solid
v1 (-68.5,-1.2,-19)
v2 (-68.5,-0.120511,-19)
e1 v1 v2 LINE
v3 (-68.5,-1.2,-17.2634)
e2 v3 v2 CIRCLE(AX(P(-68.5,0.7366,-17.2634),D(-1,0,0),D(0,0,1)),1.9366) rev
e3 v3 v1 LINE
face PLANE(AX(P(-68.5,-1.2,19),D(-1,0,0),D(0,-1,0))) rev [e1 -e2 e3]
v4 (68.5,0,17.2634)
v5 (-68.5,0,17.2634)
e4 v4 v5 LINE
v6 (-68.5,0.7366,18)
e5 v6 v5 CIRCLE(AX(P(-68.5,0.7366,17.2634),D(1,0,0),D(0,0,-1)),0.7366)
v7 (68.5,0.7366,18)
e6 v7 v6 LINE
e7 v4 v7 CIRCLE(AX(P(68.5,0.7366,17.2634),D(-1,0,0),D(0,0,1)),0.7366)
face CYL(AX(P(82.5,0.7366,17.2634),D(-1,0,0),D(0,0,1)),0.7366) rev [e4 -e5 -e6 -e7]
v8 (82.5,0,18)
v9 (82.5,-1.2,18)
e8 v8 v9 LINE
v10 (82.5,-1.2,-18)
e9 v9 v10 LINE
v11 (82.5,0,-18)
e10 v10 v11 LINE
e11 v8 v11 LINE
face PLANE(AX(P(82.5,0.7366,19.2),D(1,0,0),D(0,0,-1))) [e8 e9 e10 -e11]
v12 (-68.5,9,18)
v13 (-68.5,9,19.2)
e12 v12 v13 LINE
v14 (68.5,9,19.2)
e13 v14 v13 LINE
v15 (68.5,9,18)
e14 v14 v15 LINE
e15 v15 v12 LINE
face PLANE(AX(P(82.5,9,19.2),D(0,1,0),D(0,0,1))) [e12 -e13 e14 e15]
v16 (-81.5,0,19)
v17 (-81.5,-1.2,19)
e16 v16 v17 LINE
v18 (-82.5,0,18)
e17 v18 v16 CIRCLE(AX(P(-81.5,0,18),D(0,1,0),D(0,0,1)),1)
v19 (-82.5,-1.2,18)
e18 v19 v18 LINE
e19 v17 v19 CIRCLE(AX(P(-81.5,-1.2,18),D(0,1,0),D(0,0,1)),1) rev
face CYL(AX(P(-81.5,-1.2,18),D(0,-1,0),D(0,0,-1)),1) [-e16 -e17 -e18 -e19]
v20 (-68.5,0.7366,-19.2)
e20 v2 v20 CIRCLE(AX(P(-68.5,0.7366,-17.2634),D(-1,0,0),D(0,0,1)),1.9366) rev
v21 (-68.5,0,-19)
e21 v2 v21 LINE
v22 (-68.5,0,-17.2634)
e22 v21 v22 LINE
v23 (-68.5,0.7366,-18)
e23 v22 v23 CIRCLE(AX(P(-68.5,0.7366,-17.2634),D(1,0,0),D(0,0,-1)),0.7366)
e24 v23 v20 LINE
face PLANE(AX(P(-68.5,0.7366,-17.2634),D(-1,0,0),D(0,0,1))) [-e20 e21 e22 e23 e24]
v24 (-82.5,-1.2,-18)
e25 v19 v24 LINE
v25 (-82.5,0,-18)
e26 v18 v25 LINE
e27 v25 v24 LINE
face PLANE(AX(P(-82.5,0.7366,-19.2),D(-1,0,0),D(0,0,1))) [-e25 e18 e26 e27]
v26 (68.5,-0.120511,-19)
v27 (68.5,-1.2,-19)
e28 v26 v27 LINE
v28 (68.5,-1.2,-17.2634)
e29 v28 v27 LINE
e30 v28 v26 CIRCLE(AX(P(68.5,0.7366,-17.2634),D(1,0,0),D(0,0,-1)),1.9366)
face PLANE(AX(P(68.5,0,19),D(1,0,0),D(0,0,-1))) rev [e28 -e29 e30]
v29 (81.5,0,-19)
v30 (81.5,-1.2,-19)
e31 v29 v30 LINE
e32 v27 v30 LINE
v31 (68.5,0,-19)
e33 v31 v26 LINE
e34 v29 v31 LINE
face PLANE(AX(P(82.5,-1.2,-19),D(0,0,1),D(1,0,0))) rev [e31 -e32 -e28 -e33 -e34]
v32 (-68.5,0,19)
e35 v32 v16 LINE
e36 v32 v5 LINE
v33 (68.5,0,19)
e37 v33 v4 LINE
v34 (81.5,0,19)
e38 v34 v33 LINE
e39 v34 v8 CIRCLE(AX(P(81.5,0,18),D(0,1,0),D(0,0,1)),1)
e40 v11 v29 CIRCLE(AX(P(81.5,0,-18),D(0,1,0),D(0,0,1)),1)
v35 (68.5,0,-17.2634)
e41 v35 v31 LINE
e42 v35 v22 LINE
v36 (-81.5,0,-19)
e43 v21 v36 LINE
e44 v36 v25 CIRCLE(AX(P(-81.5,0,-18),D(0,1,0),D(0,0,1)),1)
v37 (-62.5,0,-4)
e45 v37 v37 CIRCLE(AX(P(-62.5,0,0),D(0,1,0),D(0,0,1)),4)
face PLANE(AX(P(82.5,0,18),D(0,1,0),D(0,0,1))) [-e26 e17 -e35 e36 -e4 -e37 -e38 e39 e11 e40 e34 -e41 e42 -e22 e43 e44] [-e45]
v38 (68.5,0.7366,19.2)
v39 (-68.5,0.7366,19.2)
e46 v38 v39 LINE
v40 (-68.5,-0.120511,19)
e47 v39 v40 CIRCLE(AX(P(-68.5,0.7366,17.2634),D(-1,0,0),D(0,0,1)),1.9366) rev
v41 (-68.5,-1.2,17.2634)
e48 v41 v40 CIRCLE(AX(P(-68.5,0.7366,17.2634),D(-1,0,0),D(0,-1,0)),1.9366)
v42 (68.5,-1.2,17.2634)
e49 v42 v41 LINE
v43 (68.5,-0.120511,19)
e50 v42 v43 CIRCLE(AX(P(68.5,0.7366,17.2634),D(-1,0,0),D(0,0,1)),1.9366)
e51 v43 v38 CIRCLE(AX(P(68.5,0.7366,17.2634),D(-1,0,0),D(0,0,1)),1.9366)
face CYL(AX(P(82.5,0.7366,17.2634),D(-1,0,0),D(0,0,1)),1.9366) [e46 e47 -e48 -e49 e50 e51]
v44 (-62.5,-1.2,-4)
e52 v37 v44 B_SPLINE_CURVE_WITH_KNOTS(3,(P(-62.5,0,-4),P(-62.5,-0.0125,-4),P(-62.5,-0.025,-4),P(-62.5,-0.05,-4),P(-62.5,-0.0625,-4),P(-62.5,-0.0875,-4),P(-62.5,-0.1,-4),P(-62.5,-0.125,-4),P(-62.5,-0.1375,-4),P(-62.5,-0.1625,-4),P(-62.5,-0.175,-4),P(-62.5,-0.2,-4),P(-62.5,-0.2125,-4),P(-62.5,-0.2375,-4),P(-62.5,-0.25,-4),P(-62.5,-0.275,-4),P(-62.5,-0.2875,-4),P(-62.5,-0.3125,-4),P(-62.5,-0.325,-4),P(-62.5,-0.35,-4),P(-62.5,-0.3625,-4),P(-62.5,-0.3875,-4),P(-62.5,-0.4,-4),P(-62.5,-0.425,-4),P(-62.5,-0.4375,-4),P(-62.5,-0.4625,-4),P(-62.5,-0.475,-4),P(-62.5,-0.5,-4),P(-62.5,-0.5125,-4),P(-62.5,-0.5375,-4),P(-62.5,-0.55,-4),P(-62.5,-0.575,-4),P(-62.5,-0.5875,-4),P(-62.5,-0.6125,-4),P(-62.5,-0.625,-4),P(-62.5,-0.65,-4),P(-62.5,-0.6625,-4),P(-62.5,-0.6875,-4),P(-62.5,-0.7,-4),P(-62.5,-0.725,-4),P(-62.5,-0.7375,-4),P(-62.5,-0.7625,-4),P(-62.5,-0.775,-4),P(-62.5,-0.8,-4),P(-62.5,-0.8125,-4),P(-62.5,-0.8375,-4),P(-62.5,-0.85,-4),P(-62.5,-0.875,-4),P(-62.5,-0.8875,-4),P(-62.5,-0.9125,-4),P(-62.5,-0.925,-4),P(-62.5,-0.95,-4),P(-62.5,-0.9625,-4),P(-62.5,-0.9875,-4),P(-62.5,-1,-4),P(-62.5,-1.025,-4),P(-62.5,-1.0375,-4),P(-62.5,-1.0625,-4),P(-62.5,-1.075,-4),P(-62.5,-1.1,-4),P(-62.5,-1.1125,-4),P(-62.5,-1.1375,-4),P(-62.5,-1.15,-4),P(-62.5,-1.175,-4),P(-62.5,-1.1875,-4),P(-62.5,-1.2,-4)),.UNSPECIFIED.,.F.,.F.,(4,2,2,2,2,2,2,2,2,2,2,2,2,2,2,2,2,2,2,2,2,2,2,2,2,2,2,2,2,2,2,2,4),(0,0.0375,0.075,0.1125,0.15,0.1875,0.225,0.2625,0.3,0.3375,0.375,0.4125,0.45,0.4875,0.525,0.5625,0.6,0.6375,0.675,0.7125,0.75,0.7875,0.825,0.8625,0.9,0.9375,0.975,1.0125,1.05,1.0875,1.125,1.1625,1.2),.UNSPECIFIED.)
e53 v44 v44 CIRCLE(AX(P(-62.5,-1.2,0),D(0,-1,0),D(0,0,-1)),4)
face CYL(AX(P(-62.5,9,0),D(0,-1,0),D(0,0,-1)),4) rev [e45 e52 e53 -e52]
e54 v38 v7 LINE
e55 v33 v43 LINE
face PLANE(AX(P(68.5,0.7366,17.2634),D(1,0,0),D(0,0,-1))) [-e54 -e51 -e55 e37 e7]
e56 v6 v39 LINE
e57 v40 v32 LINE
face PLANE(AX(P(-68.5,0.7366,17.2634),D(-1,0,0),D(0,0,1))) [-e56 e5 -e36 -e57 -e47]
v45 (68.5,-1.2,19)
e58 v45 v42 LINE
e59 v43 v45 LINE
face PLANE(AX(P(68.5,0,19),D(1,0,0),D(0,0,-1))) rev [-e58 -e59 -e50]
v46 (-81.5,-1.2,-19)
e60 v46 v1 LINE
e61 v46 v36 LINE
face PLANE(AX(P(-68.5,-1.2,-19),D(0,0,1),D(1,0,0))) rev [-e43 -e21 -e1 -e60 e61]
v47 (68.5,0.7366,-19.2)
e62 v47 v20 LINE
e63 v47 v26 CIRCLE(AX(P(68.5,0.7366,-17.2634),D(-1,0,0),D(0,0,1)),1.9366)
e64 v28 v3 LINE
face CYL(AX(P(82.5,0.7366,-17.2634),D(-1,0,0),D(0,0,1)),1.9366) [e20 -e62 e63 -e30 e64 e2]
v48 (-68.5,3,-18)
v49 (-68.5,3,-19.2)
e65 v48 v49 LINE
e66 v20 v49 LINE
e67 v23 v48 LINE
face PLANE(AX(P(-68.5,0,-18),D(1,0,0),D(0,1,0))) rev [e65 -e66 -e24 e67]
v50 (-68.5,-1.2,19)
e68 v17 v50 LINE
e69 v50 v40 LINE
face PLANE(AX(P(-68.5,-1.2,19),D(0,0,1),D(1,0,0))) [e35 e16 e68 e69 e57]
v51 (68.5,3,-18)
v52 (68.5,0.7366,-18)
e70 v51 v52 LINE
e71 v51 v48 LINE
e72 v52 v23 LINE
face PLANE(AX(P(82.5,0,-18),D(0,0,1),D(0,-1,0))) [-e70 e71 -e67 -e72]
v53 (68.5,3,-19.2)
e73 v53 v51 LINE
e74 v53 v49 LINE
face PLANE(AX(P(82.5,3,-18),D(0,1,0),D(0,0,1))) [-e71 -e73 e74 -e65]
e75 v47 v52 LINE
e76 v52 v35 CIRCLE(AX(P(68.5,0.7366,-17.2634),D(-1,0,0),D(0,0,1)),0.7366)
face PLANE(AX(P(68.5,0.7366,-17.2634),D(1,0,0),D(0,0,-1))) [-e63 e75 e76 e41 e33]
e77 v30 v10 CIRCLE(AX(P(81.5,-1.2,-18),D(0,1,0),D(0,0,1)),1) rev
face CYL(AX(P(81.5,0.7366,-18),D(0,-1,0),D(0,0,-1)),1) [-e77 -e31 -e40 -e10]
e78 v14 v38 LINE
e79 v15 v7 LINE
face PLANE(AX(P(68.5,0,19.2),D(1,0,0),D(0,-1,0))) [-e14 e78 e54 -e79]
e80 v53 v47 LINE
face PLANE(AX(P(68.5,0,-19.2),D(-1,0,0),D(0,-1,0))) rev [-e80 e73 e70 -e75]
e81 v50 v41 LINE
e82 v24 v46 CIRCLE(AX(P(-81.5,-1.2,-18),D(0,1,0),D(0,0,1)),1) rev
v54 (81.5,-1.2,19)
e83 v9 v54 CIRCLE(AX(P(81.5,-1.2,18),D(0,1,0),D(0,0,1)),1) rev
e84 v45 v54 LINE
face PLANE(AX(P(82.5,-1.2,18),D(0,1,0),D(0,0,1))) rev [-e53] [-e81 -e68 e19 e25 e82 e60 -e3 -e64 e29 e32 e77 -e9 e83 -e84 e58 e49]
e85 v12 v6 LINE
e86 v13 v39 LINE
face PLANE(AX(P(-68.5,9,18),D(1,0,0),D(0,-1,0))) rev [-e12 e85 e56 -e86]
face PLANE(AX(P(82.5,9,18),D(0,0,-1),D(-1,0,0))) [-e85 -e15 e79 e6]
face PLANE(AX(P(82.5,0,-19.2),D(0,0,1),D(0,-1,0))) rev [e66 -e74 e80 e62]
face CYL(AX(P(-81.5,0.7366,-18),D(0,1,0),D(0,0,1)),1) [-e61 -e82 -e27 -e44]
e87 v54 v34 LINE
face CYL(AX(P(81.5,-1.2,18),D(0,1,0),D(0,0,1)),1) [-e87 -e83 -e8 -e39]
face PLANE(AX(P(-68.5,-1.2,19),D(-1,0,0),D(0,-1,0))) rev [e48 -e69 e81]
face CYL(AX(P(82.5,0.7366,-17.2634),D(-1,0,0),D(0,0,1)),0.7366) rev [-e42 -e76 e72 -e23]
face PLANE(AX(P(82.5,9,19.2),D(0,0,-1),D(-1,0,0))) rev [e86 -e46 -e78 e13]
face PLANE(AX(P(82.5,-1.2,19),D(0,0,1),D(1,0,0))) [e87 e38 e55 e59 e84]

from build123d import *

# Parameters (mm, degrees)
FLANGE_BASE2_DEPTH       = 82.5
CORTE_EXTRUS_O3_START    = -82.5
CORTE_EXTRUS_O3_DEPTH    = 14
CORTE_EXTRUS_O3_START_2  = 68.5
CORTE_EXTRUS_O3_2_DEPTH  = 14
ESBO_O12_W               = 14
ESBO_O12_H               = 1.2
RESSALTO_EXTRUS_O1_DEPTH = 19
FILETE1_R                = 1
ESBO_O13_R               = 4
CORTE_EXTRUS_O4_DEPTH    = 86.316645504


# Read off the part's stored shape, not the designer's step: Corte-extrusão3
# Sheet-metal steps are written as plain solids
with BuildPart() as part:
    # Esboço1 → Flange-base2 (new, symmetric)
    with BuildSketch(Plane(origin=(0, 0, 0), x_dir=(0, 0, -1), z_dir=(1, 0, 0))):
        with BuildLine():
            Line((-18, 9), (-18, 0.7366))
            ThreePointArc((-18, 0.7366), (-17.784254855, 0.215745145), (-17.2634, 0))
            Line((-17.2634, 0), (17.2634, 0))
            ThreePointArc((17.2634, 0), (17.784254855, 0.215745145), (18, 0.7366))
            Line((18, 0.7366), (18, 3))
            Line((18, 3), (19.2, 3))
            Line((19.2, 3), (19.2, 0.7366))
            ThreePointArc((19.2, 0.7366), (18.632782992, -0.632782992), (17.2634, -1.2))
            Line((17.2634, -1.2), (-17.2634, -1.2))
            ThreePointArc((-17.2634, -1.2), (-18.632782992, -0.632782992), (-19.2, 0.7366))
            Line((-19.2, 0.7366), (-19.2, 9))
            Line((-19.2, 9), (-18, 9))
        make_face()
    extrude(amount=FLANGE_BASE2_DEPTH, both=True)

    # Corte-extrusão3 outline → Corte-extrusão3 (cut)
    with BuildSketch(Plane.YZ.offset(CORTE_EXTRUS_O3_START)):
        with BuildLine():
            Line((-1.2, 17.2634), (0, 17.2634))
            ThreePointArc((0, 17.2634), (0.215745145, 17.784254855), (0.7366, 18))
            Line((0.7366, 18), (9, 18))
            Line((9, 18), (9, 19.2))
            Line((9, 19.2), (0.7366, 19.2))
            ThreePointArc((0.7366, 19.2), (-0.632782992, 18.632782992), (-1.2, 17.2634))
        make_face()
        with BuildLine():
            ThreePointArc((0.7366, -18), (0.215745145, -17.784254855), (0, -17.2634))
            Line((0, -17.2634), (-1.2, -17.2634))
            ThreePointArc((-1.2, -17.2634), (-0.632782992, -18.632782992), (0.7366, -19.2))
            Line((0.7366, -19.2), (3, -19.2))
            Line((3, -19.2), (3, -18))
            Line((3, -18), (0.7366, -18))
        make_face()
    extrude(amount=CORTE_EXTRUS_O3_DEPTH, mode=Mode.SUBTRACT)

    # Corte-extrus_o3 2 outline → Corte-extrus_o3 2 (cut)
    with BuildSketch(Plane.YZ.offset(CORTE_EXTRUS_O3_START_2)):
        with BuildLine():
            Line((-1.2, 17.2634), (0, 17.2634))
            ThreePointArc((0, 17.2634), (0.215745145, 17.784254855), (0.7366, 18))
            Line((0.7366, 18), (9, 18))
            Line((9, 18), (9, 19.2))
            Line((9, 19.2), (0.7366, 19.2))
            ThreePointArc((0.7366, 19.2), (-0.632782992, 18.632782992), (-1.2, 17.2634))
        make_face()
        with BuildLine():
            ThreePointArc((0.7366, -18), (0.215745145, -17.784254855), (0, -17.2634))
            Line((0, -17.2634), (-1.2, -17.2634))
            ThreePointArc((-1.2, -17.2634), (-0.632782992, -18.632782992), (0.7366, -19.2))
            Line((0.7366, -19.2), (3, -19.2))
            Line((3, -19.2), (3, -18))
            Line((3, -18), (0.7366, -18))
        make_face()
    extrude(amount=CORTE_EXTRUS_O3_2_DEPTH, mode=Mode.SUBTRACT)

    # Esboço12 → Ressalto-extrusão1 (add, symmetric)
    with BuildSketch(Plane.XY):
        with Locations((75.5, -0.6)):
            Rectangle(ESBO_O12_W, ESBO_O12_H)
        with Locations((-75.5, -0.6)):
            Rectangle(ESBO_O12_W, ESBO_O12_H)
    extrude(amount=RESSALTO_EXTRUS_O1_DEPTH, both=True)

    # Filete1
    filete1_edges = [part.edges().sort_by_distance(p)[0] for p in [
        (82.5, -0.6, -19),
        (82.5, -0.6, 19),
        (-82.5, -0.6, -19),
        (-82.5, -0.6, 19),
    ]]
    fillet(filete1_edges, radius=FILETE1_R)

    # Esboço13 → Corte-extrusão4 (cut, through all)
    with BuildSketch(Plane.XZ.offset(1.2)):
        with Locations(Location((-62.5, 0, 0), (0, 0, 270))):
            Circle(ESBO_O13_R)
    extrude(amount=-CORTE_EXTRUS_O4_DEPTH, mode=Mode.SUBTRACT)


solid = part.part
